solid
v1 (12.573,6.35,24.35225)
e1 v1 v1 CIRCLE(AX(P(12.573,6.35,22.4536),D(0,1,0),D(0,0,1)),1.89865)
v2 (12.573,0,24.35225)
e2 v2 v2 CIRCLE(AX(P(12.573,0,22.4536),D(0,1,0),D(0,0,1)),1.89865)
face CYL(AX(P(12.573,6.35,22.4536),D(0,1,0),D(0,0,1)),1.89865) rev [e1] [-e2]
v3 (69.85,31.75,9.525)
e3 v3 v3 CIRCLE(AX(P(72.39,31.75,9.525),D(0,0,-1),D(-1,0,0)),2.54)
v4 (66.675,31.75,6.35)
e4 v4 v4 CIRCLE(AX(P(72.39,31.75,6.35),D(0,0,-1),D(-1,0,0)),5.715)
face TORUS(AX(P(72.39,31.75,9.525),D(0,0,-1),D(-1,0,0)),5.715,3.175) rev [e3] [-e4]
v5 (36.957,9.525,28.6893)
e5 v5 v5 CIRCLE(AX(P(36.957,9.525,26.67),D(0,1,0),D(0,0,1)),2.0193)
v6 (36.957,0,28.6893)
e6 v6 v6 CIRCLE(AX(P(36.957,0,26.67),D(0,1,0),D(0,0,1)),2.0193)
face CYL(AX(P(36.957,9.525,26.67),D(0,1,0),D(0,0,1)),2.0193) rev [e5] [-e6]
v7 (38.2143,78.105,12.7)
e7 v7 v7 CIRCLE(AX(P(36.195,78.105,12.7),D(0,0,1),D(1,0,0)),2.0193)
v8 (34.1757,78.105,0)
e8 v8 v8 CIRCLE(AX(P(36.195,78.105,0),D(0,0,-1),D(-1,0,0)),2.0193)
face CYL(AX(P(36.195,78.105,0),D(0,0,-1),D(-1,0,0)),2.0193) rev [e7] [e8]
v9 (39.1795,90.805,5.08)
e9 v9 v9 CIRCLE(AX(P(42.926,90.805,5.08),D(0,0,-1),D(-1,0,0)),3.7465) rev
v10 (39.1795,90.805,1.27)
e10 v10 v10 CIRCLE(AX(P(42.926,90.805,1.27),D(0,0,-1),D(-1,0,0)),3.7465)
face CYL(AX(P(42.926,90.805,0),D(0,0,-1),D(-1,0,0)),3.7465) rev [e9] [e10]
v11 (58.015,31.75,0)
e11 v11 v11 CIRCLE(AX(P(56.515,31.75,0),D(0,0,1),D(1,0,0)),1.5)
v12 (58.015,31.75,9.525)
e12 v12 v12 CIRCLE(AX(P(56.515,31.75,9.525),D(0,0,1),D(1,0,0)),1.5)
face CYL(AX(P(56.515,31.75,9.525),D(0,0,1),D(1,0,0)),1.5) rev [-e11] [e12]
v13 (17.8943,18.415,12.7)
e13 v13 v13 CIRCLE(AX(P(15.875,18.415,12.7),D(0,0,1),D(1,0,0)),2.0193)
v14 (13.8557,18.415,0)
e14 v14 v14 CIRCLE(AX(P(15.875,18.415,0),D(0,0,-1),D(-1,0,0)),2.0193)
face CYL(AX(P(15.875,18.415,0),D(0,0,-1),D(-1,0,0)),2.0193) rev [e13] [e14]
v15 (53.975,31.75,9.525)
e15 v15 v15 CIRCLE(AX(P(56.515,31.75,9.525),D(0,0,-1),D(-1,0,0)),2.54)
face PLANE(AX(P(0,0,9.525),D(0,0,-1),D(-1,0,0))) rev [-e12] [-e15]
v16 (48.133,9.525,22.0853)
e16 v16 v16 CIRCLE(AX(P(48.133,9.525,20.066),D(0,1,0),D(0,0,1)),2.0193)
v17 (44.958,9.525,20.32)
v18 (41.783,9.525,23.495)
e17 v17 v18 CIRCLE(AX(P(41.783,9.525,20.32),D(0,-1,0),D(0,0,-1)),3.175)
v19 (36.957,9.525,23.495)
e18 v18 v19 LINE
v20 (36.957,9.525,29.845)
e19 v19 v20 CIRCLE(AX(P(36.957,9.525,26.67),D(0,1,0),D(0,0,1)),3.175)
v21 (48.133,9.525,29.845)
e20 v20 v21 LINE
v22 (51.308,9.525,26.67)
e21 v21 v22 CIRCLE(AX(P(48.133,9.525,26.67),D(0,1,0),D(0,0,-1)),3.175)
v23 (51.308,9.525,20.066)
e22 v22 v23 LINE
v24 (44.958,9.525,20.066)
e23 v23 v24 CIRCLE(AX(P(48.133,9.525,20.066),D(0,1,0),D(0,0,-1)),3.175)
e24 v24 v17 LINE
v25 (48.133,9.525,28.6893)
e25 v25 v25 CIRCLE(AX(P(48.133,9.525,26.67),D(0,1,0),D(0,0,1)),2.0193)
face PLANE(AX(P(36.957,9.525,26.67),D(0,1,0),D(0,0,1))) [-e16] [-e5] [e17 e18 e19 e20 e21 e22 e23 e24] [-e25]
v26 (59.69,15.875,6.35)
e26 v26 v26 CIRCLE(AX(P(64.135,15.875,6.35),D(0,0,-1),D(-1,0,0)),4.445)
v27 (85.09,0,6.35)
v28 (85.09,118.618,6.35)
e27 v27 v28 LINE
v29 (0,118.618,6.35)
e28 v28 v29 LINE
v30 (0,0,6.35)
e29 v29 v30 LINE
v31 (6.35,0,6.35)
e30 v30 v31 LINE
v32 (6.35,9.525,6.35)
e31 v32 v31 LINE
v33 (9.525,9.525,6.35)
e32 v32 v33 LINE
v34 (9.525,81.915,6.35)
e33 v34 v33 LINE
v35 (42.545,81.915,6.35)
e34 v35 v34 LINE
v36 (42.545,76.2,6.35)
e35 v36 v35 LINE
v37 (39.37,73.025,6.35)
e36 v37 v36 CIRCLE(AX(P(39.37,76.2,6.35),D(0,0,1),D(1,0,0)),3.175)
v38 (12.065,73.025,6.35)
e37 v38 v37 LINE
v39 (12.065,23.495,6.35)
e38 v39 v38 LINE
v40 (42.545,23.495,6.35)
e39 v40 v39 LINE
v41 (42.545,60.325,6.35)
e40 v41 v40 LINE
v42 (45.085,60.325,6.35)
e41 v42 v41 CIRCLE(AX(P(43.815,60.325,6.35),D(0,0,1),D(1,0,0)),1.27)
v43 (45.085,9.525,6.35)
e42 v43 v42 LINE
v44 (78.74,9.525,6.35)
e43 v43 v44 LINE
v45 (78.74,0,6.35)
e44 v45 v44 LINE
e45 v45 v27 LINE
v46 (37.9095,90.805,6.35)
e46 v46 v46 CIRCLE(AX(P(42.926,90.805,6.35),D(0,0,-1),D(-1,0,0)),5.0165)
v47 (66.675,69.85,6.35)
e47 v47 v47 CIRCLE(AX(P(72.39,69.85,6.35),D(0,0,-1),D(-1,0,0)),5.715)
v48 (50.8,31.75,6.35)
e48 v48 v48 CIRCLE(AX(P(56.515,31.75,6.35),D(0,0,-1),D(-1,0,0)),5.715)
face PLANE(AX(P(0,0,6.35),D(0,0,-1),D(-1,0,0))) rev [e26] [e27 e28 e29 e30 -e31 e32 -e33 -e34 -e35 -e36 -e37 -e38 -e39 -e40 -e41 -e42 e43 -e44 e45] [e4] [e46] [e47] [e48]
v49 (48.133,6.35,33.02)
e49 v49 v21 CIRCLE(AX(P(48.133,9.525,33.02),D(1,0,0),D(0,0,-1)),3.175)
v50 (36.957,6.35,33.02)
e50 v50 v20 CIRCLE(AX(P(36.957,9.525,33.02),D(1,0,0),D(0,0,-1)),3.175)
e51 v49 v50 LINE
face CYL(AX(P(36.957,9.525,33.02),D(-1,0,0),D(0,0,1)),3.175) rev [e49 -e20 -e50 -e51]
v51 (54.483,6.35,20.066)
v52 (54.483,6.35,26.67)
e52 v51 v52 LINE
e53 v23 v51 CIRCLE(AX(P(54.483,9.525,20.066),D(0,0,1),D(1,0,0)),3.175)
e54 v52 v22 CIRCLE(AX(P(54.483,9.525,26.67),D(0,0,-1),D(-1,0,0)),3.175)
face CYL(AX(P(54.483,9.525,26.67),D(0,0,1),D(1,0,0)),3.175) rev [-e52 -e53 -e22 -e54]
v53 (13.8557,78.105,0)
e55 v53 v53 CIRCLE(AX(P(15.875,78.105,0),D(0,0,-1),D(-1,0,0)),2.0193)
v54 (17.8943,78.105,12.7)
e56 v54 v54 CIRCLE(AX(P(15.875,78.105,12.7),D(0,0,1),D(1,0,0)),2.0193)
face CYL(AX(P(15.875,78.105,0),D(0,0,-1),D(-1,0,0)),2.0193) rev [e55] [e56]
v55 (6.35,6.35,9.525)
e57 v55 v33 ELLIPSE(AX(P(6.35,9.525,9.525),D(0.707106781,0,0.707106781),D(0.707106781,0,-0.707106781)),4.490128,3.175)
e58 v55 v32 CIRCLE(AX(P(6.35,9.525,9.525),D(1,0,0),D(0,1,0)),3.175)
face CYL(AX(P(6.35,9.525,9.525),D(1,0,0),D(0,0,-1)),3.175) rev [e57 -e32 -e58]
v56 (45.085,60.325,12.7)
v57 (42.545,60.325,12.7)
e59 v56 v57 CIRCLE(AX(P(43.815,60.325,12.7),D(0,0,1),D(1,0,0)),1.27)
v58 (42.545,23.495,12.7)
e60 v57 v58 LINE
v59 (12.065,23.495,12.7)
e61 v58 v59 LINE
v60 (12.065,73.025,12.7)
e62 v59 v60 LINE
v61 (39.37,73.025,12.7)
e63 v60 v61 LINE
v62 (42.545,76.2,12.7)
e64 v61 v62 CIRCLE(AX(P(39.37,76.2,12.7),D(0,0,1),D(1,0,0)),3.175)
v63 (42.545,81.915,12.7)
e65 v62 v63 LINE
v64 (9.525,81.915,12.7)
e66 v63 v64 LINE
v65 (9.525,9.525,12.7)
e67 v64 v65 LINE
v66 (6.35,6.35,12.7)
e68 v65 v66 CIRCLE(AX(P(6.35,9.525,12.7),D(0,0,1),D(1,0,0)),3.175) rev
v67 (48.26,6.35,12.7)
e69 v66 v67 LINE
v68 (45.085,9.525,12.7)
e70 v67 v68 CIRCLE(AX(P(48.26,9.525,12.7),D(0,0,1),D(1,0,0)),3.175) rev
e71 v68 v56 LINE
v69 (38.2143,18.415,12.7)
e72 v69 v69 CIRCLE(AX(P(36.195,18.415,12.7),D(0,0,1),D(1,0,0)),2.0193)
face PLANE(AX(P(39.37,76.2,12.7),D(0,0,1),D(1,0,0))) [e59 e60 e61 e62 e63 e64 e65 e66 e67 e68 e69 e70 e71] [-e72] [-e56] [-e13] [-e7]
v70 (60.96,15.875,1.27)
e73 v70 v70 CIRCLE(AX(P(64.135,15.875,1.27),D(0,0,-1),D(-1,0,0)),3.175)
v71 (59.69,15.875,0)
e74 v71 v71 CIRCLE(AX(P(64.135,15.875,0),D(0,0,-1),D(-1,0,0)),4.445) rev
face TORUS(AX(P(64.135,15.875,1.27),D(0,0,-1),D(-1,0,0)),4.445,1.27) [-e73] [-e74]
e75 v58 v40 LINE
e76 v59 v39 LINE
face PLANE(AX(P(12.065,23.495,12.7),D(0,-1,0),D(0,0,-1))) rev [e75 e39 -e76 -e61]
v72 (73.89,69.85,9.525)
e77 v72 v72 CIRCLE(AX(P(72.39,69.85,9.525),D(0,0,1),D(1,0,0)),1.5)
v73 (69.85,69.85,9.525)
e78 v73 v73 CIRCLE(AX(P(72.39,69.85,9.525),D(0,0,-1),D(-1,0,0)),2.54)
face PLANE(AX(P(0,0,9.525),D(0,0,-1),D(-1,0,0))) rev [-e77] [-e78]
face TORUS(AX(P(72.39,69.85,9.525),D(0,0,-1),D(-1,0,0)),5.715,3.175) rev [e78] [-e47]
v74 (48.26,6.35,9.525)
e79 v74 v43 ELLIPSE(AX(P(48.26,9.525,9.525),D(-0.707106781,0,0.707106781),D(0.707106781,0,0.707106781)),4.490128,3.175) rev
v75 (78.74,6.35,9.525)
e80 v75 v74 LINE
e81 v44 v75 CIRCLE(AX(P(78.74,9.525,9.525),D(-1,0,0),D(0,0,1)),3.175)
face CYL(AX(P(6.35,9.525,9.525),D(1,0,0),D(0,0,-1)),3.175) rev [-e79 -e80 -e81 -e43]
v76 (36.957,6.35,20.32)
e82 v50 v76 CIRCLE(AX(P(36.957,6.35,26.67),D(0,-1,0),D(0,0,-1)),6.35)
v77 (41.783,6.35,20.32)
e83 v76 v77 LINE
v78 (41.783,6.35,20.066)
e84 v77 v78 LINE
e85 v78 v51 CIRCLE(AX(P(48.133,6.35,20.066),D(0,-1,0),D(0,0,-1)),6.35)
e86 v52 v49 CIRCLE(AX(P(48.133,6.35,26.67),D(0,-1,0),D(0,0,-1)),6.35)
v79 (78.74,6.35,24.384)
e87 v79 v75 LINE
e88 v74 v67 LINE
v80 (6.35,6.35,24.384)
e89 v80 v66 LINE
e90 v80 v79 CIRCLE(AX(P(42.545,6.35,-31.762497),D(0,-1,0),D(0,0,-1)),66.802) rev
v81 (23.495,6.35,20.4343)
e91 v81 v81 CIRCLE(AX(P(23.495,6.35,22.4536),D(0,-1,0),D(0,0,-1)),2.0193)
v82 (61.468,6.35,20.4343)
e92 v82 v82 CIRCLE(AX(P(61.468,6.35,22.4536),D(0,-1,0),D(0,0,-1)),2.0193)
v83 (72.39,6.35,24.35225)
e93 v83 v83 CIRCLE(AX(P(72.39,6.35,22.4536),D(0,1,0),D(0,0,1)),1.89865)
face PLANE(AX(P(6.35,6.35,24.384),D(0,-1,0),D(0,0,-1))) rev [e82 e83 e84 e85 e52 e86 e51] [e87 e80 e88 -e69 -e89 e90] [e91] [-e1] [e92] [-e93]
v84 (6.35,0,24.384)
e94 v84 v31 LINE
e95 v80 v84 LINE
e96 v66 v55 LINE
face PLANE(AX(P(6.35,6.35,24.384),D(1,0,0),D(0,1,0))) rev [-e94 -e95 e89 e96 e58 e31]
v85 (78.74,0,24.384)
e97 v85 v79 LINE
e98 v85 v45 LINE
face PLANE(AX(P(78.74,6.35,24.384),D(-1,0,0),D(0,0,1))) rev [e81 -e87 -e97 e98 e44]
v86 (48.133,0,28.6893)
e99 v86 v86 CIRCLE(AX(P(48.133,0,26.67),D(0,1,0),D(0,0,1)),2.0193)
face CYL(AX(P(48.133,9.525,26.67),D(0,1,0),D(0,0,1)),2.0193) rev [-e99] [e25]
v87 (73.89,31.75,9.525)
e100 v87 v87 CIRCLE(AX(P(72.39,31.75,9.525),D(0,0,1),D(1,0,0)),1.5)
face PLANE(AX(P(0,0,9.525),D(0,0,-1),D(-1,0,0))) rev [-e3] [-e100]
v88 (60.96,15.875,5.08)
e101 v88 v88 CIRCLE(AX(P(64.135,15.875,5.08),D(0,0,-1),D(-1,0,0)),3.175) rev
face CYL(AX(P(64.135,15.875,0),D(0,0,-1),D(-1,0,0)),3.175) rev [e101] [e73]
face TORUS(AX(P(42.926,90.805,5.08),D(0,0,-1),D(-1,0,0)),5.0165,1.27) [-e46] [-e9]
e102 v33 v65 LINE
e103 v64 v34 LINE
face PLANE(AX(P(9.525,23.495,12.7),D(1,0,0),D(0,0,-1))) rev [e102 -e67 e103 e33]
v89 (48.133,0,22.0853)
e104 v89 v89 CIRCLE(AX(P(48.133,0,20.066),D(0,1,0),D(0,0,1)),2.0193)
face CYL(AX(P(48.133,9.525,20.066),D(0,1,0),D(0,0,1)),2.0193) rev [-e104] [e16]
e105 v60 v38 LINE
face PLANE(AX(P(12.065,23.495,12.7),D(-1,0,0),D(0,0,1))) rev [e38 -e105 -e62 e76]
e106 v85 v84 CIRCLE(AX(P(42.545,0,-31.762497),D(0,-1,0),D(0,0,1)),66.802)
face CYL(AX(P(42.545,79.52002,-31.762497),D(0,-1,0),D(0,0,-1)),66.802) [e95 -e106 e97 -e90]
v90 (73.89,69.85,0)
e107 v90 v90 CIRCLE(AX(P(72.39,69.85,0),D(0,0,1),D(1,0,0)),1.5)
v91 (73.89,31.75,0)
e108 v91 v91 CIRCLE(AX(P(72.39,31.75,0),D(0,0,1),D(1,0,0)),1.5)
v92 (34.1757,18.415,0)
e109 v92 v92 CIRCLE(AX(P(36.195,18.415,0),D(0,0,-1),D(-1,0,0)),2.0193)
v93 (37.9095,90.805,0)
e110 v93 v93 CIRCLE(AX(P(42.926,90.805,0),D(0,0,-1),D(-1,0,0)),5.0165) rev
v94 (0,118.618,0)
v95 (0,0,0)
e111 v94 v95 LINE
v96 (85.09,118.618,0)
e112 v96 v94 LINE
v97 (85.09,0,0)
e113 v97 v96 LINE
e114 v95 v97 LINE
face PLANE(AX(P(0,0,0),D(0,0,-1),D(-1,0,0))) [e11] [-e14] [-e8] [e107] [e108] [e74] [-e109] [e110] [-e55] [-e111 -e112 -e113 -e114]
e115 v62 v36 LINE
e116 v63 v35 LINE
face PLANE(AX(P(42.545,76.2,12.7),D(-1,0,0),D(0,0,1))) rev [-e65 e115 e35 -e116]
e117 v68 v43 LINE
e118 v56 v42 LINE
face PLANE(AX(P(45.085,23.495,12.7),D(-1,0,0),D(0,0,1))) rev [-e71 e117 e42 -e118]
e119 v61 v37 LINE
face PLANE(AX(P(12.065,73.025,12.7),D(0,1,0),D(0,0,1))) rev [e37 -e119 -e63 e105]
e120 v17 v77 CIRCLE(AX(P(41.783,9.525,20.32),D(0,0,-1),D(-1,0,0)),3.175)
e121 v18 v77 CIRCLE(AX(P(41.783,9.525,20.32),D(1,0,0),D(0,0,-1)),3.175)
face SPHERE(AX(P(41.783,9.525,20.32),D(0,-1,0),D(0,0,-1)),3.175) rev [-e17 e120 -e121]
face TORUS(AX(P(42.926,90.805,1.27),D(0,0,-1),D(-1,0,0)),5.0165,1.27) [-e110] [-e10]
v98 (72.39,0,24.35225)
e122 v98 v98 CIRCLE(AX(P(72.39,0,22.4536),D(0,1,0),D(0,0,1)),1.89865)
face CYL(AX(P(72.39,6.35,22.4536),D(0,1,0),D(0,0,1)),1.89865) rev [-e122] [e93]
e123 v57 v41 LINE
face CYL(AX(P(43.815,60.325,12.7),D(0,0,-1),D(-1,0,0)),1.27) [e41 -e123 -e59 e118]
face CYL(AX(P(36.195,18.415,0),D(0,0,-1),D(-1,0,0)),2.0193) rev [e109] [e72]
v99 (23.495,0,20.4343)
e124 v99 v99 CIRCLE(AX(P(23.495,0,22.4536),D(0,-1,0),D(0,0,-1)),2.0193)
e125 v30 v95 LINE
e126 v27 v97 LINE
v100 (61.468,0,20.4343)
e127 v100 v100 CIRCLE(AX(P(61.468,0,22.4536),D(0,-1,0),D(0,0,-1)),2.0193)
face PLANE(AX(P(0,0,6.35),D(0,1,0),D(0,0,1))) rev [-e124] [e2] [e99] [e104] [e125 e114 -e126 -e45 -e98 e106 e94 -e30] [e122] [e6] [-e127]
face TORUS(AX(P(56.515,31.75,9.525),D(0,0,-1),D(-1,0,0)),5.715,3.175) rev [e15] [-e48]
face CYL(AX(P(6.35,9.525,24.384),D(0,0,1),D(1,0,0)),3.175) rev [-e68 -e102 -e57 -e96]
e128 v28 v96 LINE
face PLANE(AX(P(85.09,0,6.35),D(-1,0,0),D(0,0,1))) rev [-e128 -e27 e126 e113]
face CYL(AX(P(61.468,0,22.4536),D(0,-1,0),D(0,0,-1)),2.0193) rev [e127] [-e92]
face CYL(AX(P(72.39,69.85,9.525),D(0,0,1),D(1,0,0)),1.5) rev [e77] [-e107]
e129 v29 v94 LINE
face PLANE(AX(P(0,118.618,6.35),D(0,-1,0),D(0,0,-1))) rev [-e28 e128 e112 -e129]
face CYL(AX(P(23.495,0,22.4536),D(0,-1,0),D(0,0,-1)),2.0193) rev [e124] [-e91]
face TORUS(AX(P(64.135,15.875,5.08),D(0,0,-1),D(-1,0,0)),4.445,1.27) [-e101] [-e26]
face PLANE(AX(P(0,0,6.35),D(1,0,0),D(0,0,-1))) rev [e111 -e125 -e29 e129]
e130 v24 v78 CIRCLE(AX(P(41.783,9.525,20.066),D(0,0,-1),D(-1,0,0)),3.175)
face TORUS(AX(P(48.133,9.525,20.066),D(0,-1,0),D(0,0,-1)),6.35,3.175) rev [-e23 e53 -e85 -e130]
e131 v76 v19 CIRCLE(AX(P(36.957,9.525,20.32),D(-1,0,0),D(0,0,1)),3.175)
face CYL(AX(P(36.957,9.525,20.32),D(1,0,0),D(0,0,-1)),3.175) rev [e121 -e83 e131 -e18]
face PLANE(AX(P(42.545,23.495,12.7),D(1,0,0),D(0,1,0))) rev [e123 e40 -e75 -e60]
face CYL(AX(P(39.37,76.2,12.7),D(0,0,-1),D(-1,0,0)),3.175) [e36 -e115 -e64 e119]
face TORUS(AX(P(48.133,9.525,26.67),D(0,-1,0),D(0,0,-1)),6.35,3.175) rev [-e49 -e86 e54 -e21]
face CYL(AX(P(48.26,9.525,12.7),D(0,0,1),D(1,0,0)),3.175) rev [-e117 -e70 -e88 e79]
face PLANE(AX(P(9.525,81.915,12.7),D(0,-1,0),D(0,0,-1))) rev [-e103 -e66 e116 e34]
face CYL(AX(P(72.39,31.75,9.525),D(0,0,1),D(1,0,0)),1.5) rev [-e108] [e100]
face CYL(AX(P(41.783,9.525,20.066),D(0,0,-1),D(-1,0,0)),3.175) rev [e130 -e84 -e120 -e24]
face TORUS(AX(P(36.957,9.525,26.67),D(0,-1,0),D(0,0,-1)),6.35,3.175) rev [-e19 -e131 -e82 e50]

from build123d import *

# Parameters (mm, degrees)
SKETCH2_W                          = 85.09
SKETCH2_H                          = 118.618
BOSS1_MAIN_FIGURE_DEPTH            = 6.35
SKETCH3_W                          = 72.39
SKETCH3_H                          = 6.35
BOSS2_BOTTOM_PLATE_DEPTH           = 18.034
BOSS3_BOTTOM_ROUNDED_CAP_DEPTH     = 6.35
BOSS3_CARD_HOLDER_DEPTH            = 6.35
FILLET1_BOTTOM_PLATE_R             = 3.175
HOLES1_MAIN_PLATE_D                = 4.0386
HOLES3_UPPER_LARGE_D               = 7.493
HOLES4_LOWER_LARGE_D               = 6.35
FILLET2_LARGE_HOLES_R              = 1.27
HOLES5_SMALL_BOTTOM_PLATE_D        = 4.0386
SKETCH32_R                         = 2.54
BOSS4_MAIN_PLATE_STANDOFFS_DEPTH   = 3.175
HOLES5_MAIN_PLATE_D                = 3.000000096
FILLET3_MAIN_PLATE_STANDOFFS_R     = 3.175
BOSS5_BOTTOM_PLATE_STANDOFFS_DEPTH = 3.175
FILLET4_BOTTOM_PLATE_STANDOFFS_R   = 3.175
HOLES6_BOTTOM_PLATE_D              = 4.0386
HOLES7_D                           = 3.7973


with BuildPart() as part:
    # Sketch2 → Boss1 - Main Figure (new body)
    with BuildSketch(Plane.XY):
        with Locations((42.545, 59.309)):
            Rectangle(SKETCH2_W, SKETCH2_H)
    extrude(amount=BOSS1_MAIN_FIGURE_DEPTH)

    # Sketch3 → Boss2 - Bottom Plate (add)
    with BuildSketch(Plane.XY.offset(6.35)):
        with Locations((42.545, 3.175)):
            Rectangle(SKETCH3_W, SKETCH3_H)
    extrude(amount=BOSS2_BOTTOM_PLATE_DEPTH)

    # Sketch4 → Boss3 - Bottom Rounded Cap (add)
    with BuildSketch(Plane.XZ):
        with BuildLine():
            Line((6.35, 24.384), (78.74, 24.384))
            ThreePointArc((78.74, 24.384), (42.545, 35.039502522), (6.35, 24.384))
        make_face()
    extrude(amount=-BOSS3_BOTTOM_ROUNDED_CAP_DEPTH)

    # Sketch7 → Boss3 - Card Holder (add)
    with BuildSketch(Plane.XY.offset(6.35)):
        with BuildLine():
            Line((9.525, 6.35), (45.085, 6.35))
            Line((45.085, 6.35), (45.085, 23.495))
            Line((45.085, 23.495), (45.085, 60.325))
            ThreePointArc((45.085, 60.325), (43.815, 61.595), (42.545, 60.325))
            Line((42.545, 60.325), (42.545, 23.495))
            Line((42.545, 23.495), (12.065, 23.495))
            Line((12.065, 23.495), (12.065, 73.025))
            Line((12.065, 73.025), (39.37, 73.025))
            ThreePointArc((39.37, 73.025), (41.61506403, 73.95493597), (42.545, 76.2))
            Line((42.545, 76.2), (42.545, 81.915))
            Line((42.545, 81.915), (9.525, 81.915))
            Line((9.525, 81.915), (9.525, 73.025))
            Line((9.525, 73.025), (9.525, 23.495))
            Line((9.525, 23.495), (9.525, 6.35))
        make_face()
    extrude(amount=BOSS3_CARD_HOLDER_DEPTH)

    # Fillet1 - Bottom Plate
    fillet1_bottom_plate_edges = [part.edges().sort_by_distance(p)[0] for p in [
        (61.9125, 6.35, 6.35),
        (7.9375, 6.35, 6.35),
        (9.525, 6.35, 9.525),
        (45.085, 6.35, 9.525),
    ]]
    fillet(fillet1_bottom_plate_edges, radius=FILLET1_BOTTOM_PLATE_R - 0.0001)  # a hair under: the kernel refuses the full size

    # Holes1 - Main Plate (through all)
    with Locations(Plane(origin=(36.195, 78.105, 0), x_dir=(-1, 0, 0), z_dir=(0, 0, -1))):
        with Locations((0, 0), (20.32, 0), (0, -59.69), (20.32, -59.69)):
            Hole(HOLES1_MAIN_PLATE_D / 2)

    # Holes3 - Upper Large (through all)
    with Locations(Plane(origin=(0, 0, 0), x_dir=(-1, 0, 0), z_dir=(0, 0, -1))):
        with Locations((-42.926, 90.805)):
            Hole(HOLES3_UPPER_LARGE_D / 2)

    # Holes4 - Lower Large (through all)
    with Locations(Plane(origin=(0, 0, 0), x_dir=(-1, 0, 0), z_dir=(0, 0, -1))):
        with Locations((-64.135, 15.875)):
            Hole(HOLES4_LOWER_LARGE_D / 2)

    # Fillet2 - Large Holes
    fillet2_large_holes_edges = [part.edges().sort_by_distance(p)[0] for p in [
        (39.1795, 90.805, 6.35),
        (39.1795, 90.805, 0),
        (60.96, 15.875, 6.35),
        (60.96, 15.875, 0),
    ]]
    fillet(fillet2_large_holes_edges, radius=FILLET2_LARGE_HOLES_R)

    # Holes5 - Small Bottom Plate (through all)
    with Locations(Plane(origin=(0, 0, 0), x_dir=(-1, 0, 0), z_dir=(0, -1, 0))):
        with Locations((-23.495, -22.4536), (-61.468, -22.4536)):
            Hole(HOLES5_SMALL_BOTTOM_PLATE_D / 2)

    # Sketch32 → Boss4 - Main Plate Standoffs (add)
    with BuildSketch(Plane.XY.offset(6.35)):
        with Locations(Location((72.39, 69.85, 0), (0, 0, 180))):
            Circle(SKETCH32_R)
        with Locations(Location((56.515, 31.75, 0), (0, 0, 180))):
            Circle(SKETCH32_R)
        with Locations(Location((72.39, 31.75, 0), (0, 0, 180))):
            Circle(SKETCH32_R)
    extrude(amount=BOSS4_MAIN_PLATE_STANDOFFS_DEPTH)

    # Holes5 - Main Plate (through all)
    with Locations(Plane.XY.offset(9.525)):
        with Locations((72.39, 69.85), (72.39, 31.75), (56.515, 31.75)):
            Hole(HOLES5_MAIN_PLATE_D / 2)

    # Fillet3 - Main Plate Standoffs
    fillet3_main_plate_standoffs_edges = [part.edges().sort_by_distance(p)[0] for p in [
        (74.93, 69.85, 6.35),
        (59.055, 31.75, 6.35),
        (74.93, 31.75, 6.35),
    ]]
    fillet(fillet3_main_plate_standoffs_edges, radius=FILLET3_MAIN_PLATE_STANDOFFS_R - 0.0001)  # a hair under: the kernel refuses the full size

    # Sketch36 → Boss5 - Bottom Plate Standoffs (add)
    with BuildSketch(Plane(origin=(0, 6.35, 0), x_dir=(1, 0, 0), z_dir=(0, 1, 0))):
        with BuildLine():
            Line((36.957, -23.495), (41.783, -23.495))
            ThreePointArc((41.783, -23.495), (44.02806403, -22.56506403), (44.958, -20.32))
            Line((44.958, -20.32), (44.958, -20.066))
            ThreePointArc((44.958, -20.066), (48.133, -16.891), (51.308, -20.066))
            Line((51.308, -20.066), (51.308, -26.67))
            ThreePointArc((51.308, -26.67), (50.37806403, -28.91506403), (48.133, -29.845))
            Line((48.133, -29.845), (36.957, -29.845))
            ThreePointArc((36.957, -29.845), (33.782, -26.67), (36.957, -23.495))
        make_face()
    extrude(amount=BOSS5_BOTTOM_PLATE_STANDOFFS_DEPTH)

    # Fillet4 - Bottom Plate Standoffs
    fillet4_bottom_plate_standoffs_edges = [part.edges().sort_by_distance(p)[0] for p in [
        (39.37, 6.35, 23.495),
        (44.958, 6.35, 20.193),
        (44.02806403, 6.35, 22.56506403),
        (33.782, 6.35, 26.67),
        (48.133, 6.35, 16.891),
        (51.308, 6.35, 23.368),
        (50.37806403, 6.35, 28.91506403),
        (42.545, 6.35, 29.845),
    ]]
    fillet(fillet4_bottom_plate_standoffs_edges, radius=FILLET4_BOTTOM_PLATE_STANDOFFS_R - 0.0001)  # a hair under: the kernel refuses the full size

    # Holes6 - Bottom Plate (through all)
    with Locations(Plane(origin=(0, 9.525, 0), x_dir=(1, 0, 0), z_dir=(0, 1, 0))):
        with Locations((36.957, -26.67), (48.133, -26.67), (48.133, -20.066)):
            Hole(HOLES6_BOTTOM_PLATE_D / 2)

    # Holes7 (through all)
    with Locations(Plane(origin=(0, 6.35, 0), x_dir=(1, 0, 0), z_dir=(0, 1, 0))):
        with Locations((72.39, -22.4536), (12.573, -22.4536)):
            Hole(HOLES7_D / 2)


solid = part.part
